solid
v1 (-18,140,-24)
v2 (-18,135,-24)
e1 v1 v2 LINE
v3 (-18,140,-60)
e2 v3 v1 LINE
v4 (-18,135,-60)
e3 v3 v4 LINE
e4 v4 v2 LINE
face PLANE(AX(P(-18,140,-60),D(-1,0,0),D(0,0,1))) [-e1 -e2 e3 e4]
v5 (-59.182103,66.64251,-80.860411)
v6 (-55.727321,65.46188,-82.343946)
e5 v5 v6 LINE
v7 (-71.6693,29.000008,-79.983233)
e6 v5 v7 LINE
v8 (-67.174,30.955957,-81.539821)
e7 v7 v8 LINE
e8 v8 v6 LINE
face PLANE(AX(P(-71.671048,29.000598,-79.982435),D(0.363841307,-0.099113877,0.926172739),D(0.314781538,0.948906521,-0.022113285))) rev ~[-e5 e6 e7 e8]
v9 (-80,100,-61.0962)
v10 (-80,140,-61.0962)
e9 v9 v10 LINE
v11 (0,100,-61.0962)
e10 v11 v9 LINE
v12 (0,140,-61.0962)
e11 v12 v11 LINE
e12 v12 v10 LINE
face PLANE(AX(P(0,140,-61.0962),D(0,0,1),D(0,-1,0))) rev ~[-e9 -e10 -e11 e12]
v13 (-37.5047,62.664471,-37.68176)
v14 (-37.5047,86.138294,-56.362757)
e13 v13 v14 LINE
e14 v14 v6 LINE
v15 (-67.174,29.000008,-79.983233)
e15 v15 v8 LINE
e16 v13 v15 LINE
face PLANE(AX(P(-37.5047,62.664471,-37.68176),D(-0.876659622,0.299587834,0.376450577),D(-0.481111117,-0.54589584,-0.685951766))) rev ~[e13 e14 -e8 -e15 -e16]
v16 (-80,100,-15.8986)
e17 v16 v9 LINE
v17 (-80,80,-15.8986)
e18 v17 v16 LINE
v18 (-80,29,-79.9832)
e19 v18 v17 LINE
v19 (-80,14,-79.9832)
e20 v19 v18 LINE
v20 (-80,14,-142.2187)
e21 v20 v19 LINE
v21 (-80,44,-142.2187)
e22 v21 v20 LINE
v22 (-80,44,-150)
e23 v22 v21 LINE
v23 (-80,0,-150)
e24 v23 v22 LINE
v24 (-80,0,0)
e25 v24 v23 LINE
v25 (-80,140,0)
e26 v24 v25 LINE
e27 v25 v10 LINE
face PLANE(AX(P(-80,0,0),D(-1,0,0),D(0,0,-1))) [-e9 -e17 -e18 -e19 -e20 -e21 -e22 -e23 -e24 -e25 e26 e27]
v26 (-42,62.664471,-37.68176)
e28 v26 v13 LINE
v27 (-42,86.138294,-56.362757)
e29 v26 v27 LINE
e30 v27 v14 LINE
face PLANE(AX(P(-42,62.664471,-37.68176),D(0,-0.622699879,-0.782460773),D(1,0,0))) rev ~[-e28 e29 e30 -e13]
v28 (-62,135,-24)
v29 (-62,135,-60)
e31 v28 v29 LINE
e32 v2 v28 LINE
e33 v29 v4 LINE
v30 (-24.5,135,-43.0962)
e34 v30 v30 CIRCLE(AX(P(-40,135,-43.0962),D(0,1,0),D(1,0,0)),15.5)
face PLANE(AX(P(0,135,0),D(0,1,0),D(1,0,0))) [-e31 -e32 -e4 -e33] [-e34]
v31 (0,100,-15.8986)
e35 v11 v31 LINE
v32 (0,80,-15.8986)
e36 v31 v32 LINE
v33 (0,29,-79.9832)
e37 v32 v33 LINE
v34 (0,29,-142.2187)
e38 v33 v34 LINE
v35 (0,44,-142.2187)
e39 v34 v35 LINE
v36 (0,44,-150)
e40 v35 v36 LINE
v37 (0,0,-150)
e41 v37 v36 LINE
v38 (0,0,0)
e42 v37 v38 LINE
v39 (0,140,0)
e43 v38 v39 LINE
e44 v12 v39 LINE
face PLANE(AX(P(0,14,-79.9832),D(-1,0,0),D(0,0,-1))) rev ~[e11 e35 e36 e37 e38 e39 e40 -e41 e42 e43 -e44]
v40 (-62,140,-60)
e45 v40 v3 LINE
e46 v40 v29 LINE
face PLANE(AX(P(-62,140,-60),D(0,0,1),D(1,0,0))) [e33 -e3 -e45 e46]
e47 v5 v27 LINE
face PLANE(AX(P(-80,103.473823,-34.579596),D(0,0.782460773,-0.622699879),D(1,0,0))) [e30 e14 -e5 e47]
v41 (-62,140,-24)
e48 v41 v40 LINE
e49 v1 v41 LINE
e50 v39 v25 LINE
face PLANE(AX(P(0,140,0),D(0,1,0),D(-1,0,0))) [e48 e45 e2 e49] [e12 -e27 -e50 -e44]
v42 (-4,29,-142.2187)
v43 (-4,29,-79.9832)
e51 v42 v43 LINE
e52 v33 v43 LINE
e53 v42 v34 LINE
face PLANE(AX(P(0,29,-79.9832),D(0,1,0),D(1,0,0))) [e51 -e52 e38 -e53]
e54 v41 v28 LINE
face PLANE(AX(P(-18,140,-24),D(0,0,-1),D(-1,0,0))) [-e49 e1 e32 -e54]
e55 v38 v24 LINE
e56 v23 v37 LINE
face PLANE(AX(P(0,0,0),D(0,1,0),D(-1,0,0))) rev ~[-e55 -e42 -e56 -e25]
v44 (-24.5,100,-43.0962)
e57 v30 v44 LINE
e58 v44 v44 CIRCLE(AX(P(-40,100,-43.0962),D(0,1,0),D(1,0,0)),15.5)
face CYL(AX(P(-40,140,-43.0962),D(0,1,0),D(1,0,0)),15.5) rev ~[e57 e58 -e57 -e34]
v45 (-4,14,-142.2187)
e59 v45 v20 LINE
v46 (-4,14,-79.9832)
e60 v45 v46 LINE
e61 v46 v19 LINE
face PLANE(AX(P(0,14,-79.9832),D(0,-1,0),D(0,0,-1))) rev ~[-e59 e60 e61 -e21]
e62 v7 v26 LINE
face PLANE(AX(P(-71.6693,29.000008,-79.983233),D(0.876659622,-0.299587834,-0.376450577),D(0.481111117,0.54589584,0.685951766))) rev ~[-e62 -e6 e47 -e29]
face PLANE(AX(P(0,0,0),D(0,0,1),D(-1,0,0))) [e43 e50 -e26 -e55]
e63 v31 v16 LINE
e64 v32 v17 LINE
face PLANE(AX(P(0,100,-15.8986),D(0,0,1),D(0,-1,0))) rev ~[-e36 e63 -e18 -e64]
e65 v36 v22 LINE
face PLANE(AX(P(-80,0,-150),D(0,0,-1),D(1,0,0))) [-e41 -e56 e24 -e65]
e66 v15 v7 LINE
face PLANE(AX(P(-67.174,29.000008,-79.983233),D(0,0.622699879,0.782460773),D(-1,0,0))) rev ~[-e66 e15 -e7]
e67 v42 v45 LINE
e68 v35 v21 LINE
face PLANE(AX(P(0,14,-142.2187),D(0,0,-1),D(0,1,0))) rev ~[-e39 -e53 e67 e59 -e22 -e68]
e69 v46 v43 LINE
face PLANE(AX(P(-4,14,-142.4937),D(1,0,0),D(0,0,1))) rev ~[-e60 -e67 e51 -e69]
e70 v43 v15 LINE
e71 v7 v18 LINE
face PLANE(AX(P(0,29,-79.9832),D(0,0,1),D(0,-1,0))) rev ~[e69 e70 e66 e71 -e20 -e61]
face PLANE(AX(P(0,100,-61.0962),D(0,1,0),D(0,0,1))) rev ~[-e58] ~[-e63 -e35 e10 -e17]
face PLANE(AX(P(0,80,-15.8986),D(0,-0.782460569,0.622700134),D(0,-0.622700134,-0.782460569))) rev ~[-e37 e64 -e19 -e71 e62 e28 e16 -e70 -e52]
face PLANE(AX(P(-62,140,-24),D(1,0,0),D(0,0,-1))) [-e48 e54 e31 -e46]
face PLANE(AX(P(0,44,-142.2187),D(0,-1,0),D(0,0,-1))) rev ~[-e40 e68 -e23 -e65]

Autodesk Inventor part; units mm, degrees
ref_plane "YZ Plane" through (0, 0, 0) normal (1, 0, 0) x (0, 1, 0)
ref_plane "XZ Plane" through (0, 0, 0) normal (0, 1, 0) x (-1, 0, 0)
ref_plane "XY Plane" through (0, 0, 0) normal (0, 0, 1) x (1, 0, 0)
sketch "Sketch1" plane through (0, 0, 0) normal (0, 1, 0) x (-1, 0, 0)
  line L0 (0, 0) -> (80, 0)
  line L1 (80, 0) -> (80, -150)
  line L2 (80, -150) -> (0, -150)
  line L3 (0, -150) -> (0, 0)
  dimension "d0" = 80
  dimension "d1" = 150
extrude "Extrusion1" add sketch "Sketch1" along normal blind 140
sketch "Sketch2" plane through (0, 0, 0) normal (1, 0, 0) x (0, 0, -1)
  line L0 (150, 140) -> (0, 140) projected
  line L1 (61.0962, 140) -> (61.0962, 100)
  line L2 (61.0962, 100) -> (15.8986, 100)
  line L3 (15.8986, 80) -> (79.9832, 29)
  line L4 (79.9832, 29) -> (79.9832, 14)
  line L5 (79.9832, 14) -> (142.2187, 14)
  line L6 (142.2187, 14) -> (142.2187, 44)
  line L7 (142.2187, 44) -> (150, 44)
  line L8 (150, 0) -> (150, 140) projected
  line L9 (150, 44) -> (150, 140)
  line L10 (150, 140) -> (61.0962, 140)
  line L11 (15.8986, 100) -> (15.8986, 80)
  line L12 (0, 0) -> (150, 0) projected
  point P0 (146.1093, 44)
  point P1 (111.101, 14)
  dimension "d7" = 15
  dimension "d8" = 30
  dimension "d9" = 14
  dimension "d11" = 40
  dimension "d12" = 20
extrude "Extrusion2" cut sketch "Sketch2" against normal blind 140
sketch "Sketch3" plane through (0, 14, -79.9832) normal (0, 1, 0) x (1, 0, 0)
  line L0 (0, -79.9832) -> (0, 70.0168) projected
  line L1 (0, 0) -> (-80, 0) projected
  line L2 (0, 62.5105) -> (-4, 62.5105)
  line L3 (-4, 62.5105) -> (-4, 0)
  line L4 (-4, 0) -> (0, 0)
  line L5 (0, 0) -> (0, 62.5105)
  dimension "d13" = 4
extrude "Extrusion3" add sketch "Sketch3" along normal blind 15
sketch "Sketch4" plane through (0, 140, 0) normal (0, 1, 0) x (1, 0, 0)
  circle A0 centre (-40, 43.0962) radius 15.5
  line L0 (0, 61.0962) -> (-80, 61.0962) projected
  line L1 (0, 0) -> (0, 61.0962) projected
  dimension "d18" = 31
  dimension "d19" = 18
  dimension "d20" = 40
extrude "Extrusion4" cut sketch "Sketch4" against normal blind 50
sketch "Sketch5" plane through (0, 140, 0) normal (0, 1, 0) x (1, 0, 0)
  line L0 (-18, 24) -> (-62, 24)
  line L1 (-62, 24) -> (-62, 60)
  line L2 (-62, 60) -> (-18, 60)
  line L3 (-18, 60) -> (-18, 24)
  line L4 (-80, 61.0962) -> (-80, 0) projected
  line L5 (0, 0) -> (0, 61.0962) projected
  line L6 (-80, 0) -> (0, 0) projected
  line L7 (0, 61.0962) -> (-80, 61.0962) projected
  dimension "d21" = 36
  dimension "d22" = 18
  dimension "d23" = 18
  dimension "d26" = 24
extrude "Extrusion5" cut sketch "Sketch5" against normal blind 5 contours L0 L1 L2 L3
sketch "Sketch6" plane through (-80, 80, -15.8986) normal (0, 0.7824608, -0.6226999) x (1, 0, 0)
  line L0 (76, 81.9014) -> (0, 81.9014) projected
  line L1 (8.3307, 81.9014) -> (38, 27.8393)
  line L2 (38, 27.8393) -> (42.4953, 27.8393)
  line L3 (42.4953, 27.8393) -> (12.826, 81.9014)
  line L4 (12.826, 81.9014) -> (8.3307, 81.9014)
  point P0 (80, 37.376)
  point P1 (12.826, 81.9014)
extrude "Extrusion6" add sketch "Sketch6" along normal blind 30
sketch "Sketch7" plane through (-71.6693, 29, -79.9832) normal (-0.8766596, 0.2995878, 0.3764506) x (0.4811111, 0.5458959, 0.6859518)
  line L0 (-0.005, -0.0058) -> (32.9106, 38.0398)
  line L1 (32.9106, 38.0398) -> (9.9736, 41.528)
  line L2 (2.1627, 30) -> (0, 30) projected
  line L3 (9.9736, 41.528) -> (0, 30)
  line L4 (0, 30) -> (0, 0)
  point P0 (73.5146, -72.4969)
extrude "Extrusion7" cut sketch "Sketch7" against normal blind 15
properties part number "Right"
